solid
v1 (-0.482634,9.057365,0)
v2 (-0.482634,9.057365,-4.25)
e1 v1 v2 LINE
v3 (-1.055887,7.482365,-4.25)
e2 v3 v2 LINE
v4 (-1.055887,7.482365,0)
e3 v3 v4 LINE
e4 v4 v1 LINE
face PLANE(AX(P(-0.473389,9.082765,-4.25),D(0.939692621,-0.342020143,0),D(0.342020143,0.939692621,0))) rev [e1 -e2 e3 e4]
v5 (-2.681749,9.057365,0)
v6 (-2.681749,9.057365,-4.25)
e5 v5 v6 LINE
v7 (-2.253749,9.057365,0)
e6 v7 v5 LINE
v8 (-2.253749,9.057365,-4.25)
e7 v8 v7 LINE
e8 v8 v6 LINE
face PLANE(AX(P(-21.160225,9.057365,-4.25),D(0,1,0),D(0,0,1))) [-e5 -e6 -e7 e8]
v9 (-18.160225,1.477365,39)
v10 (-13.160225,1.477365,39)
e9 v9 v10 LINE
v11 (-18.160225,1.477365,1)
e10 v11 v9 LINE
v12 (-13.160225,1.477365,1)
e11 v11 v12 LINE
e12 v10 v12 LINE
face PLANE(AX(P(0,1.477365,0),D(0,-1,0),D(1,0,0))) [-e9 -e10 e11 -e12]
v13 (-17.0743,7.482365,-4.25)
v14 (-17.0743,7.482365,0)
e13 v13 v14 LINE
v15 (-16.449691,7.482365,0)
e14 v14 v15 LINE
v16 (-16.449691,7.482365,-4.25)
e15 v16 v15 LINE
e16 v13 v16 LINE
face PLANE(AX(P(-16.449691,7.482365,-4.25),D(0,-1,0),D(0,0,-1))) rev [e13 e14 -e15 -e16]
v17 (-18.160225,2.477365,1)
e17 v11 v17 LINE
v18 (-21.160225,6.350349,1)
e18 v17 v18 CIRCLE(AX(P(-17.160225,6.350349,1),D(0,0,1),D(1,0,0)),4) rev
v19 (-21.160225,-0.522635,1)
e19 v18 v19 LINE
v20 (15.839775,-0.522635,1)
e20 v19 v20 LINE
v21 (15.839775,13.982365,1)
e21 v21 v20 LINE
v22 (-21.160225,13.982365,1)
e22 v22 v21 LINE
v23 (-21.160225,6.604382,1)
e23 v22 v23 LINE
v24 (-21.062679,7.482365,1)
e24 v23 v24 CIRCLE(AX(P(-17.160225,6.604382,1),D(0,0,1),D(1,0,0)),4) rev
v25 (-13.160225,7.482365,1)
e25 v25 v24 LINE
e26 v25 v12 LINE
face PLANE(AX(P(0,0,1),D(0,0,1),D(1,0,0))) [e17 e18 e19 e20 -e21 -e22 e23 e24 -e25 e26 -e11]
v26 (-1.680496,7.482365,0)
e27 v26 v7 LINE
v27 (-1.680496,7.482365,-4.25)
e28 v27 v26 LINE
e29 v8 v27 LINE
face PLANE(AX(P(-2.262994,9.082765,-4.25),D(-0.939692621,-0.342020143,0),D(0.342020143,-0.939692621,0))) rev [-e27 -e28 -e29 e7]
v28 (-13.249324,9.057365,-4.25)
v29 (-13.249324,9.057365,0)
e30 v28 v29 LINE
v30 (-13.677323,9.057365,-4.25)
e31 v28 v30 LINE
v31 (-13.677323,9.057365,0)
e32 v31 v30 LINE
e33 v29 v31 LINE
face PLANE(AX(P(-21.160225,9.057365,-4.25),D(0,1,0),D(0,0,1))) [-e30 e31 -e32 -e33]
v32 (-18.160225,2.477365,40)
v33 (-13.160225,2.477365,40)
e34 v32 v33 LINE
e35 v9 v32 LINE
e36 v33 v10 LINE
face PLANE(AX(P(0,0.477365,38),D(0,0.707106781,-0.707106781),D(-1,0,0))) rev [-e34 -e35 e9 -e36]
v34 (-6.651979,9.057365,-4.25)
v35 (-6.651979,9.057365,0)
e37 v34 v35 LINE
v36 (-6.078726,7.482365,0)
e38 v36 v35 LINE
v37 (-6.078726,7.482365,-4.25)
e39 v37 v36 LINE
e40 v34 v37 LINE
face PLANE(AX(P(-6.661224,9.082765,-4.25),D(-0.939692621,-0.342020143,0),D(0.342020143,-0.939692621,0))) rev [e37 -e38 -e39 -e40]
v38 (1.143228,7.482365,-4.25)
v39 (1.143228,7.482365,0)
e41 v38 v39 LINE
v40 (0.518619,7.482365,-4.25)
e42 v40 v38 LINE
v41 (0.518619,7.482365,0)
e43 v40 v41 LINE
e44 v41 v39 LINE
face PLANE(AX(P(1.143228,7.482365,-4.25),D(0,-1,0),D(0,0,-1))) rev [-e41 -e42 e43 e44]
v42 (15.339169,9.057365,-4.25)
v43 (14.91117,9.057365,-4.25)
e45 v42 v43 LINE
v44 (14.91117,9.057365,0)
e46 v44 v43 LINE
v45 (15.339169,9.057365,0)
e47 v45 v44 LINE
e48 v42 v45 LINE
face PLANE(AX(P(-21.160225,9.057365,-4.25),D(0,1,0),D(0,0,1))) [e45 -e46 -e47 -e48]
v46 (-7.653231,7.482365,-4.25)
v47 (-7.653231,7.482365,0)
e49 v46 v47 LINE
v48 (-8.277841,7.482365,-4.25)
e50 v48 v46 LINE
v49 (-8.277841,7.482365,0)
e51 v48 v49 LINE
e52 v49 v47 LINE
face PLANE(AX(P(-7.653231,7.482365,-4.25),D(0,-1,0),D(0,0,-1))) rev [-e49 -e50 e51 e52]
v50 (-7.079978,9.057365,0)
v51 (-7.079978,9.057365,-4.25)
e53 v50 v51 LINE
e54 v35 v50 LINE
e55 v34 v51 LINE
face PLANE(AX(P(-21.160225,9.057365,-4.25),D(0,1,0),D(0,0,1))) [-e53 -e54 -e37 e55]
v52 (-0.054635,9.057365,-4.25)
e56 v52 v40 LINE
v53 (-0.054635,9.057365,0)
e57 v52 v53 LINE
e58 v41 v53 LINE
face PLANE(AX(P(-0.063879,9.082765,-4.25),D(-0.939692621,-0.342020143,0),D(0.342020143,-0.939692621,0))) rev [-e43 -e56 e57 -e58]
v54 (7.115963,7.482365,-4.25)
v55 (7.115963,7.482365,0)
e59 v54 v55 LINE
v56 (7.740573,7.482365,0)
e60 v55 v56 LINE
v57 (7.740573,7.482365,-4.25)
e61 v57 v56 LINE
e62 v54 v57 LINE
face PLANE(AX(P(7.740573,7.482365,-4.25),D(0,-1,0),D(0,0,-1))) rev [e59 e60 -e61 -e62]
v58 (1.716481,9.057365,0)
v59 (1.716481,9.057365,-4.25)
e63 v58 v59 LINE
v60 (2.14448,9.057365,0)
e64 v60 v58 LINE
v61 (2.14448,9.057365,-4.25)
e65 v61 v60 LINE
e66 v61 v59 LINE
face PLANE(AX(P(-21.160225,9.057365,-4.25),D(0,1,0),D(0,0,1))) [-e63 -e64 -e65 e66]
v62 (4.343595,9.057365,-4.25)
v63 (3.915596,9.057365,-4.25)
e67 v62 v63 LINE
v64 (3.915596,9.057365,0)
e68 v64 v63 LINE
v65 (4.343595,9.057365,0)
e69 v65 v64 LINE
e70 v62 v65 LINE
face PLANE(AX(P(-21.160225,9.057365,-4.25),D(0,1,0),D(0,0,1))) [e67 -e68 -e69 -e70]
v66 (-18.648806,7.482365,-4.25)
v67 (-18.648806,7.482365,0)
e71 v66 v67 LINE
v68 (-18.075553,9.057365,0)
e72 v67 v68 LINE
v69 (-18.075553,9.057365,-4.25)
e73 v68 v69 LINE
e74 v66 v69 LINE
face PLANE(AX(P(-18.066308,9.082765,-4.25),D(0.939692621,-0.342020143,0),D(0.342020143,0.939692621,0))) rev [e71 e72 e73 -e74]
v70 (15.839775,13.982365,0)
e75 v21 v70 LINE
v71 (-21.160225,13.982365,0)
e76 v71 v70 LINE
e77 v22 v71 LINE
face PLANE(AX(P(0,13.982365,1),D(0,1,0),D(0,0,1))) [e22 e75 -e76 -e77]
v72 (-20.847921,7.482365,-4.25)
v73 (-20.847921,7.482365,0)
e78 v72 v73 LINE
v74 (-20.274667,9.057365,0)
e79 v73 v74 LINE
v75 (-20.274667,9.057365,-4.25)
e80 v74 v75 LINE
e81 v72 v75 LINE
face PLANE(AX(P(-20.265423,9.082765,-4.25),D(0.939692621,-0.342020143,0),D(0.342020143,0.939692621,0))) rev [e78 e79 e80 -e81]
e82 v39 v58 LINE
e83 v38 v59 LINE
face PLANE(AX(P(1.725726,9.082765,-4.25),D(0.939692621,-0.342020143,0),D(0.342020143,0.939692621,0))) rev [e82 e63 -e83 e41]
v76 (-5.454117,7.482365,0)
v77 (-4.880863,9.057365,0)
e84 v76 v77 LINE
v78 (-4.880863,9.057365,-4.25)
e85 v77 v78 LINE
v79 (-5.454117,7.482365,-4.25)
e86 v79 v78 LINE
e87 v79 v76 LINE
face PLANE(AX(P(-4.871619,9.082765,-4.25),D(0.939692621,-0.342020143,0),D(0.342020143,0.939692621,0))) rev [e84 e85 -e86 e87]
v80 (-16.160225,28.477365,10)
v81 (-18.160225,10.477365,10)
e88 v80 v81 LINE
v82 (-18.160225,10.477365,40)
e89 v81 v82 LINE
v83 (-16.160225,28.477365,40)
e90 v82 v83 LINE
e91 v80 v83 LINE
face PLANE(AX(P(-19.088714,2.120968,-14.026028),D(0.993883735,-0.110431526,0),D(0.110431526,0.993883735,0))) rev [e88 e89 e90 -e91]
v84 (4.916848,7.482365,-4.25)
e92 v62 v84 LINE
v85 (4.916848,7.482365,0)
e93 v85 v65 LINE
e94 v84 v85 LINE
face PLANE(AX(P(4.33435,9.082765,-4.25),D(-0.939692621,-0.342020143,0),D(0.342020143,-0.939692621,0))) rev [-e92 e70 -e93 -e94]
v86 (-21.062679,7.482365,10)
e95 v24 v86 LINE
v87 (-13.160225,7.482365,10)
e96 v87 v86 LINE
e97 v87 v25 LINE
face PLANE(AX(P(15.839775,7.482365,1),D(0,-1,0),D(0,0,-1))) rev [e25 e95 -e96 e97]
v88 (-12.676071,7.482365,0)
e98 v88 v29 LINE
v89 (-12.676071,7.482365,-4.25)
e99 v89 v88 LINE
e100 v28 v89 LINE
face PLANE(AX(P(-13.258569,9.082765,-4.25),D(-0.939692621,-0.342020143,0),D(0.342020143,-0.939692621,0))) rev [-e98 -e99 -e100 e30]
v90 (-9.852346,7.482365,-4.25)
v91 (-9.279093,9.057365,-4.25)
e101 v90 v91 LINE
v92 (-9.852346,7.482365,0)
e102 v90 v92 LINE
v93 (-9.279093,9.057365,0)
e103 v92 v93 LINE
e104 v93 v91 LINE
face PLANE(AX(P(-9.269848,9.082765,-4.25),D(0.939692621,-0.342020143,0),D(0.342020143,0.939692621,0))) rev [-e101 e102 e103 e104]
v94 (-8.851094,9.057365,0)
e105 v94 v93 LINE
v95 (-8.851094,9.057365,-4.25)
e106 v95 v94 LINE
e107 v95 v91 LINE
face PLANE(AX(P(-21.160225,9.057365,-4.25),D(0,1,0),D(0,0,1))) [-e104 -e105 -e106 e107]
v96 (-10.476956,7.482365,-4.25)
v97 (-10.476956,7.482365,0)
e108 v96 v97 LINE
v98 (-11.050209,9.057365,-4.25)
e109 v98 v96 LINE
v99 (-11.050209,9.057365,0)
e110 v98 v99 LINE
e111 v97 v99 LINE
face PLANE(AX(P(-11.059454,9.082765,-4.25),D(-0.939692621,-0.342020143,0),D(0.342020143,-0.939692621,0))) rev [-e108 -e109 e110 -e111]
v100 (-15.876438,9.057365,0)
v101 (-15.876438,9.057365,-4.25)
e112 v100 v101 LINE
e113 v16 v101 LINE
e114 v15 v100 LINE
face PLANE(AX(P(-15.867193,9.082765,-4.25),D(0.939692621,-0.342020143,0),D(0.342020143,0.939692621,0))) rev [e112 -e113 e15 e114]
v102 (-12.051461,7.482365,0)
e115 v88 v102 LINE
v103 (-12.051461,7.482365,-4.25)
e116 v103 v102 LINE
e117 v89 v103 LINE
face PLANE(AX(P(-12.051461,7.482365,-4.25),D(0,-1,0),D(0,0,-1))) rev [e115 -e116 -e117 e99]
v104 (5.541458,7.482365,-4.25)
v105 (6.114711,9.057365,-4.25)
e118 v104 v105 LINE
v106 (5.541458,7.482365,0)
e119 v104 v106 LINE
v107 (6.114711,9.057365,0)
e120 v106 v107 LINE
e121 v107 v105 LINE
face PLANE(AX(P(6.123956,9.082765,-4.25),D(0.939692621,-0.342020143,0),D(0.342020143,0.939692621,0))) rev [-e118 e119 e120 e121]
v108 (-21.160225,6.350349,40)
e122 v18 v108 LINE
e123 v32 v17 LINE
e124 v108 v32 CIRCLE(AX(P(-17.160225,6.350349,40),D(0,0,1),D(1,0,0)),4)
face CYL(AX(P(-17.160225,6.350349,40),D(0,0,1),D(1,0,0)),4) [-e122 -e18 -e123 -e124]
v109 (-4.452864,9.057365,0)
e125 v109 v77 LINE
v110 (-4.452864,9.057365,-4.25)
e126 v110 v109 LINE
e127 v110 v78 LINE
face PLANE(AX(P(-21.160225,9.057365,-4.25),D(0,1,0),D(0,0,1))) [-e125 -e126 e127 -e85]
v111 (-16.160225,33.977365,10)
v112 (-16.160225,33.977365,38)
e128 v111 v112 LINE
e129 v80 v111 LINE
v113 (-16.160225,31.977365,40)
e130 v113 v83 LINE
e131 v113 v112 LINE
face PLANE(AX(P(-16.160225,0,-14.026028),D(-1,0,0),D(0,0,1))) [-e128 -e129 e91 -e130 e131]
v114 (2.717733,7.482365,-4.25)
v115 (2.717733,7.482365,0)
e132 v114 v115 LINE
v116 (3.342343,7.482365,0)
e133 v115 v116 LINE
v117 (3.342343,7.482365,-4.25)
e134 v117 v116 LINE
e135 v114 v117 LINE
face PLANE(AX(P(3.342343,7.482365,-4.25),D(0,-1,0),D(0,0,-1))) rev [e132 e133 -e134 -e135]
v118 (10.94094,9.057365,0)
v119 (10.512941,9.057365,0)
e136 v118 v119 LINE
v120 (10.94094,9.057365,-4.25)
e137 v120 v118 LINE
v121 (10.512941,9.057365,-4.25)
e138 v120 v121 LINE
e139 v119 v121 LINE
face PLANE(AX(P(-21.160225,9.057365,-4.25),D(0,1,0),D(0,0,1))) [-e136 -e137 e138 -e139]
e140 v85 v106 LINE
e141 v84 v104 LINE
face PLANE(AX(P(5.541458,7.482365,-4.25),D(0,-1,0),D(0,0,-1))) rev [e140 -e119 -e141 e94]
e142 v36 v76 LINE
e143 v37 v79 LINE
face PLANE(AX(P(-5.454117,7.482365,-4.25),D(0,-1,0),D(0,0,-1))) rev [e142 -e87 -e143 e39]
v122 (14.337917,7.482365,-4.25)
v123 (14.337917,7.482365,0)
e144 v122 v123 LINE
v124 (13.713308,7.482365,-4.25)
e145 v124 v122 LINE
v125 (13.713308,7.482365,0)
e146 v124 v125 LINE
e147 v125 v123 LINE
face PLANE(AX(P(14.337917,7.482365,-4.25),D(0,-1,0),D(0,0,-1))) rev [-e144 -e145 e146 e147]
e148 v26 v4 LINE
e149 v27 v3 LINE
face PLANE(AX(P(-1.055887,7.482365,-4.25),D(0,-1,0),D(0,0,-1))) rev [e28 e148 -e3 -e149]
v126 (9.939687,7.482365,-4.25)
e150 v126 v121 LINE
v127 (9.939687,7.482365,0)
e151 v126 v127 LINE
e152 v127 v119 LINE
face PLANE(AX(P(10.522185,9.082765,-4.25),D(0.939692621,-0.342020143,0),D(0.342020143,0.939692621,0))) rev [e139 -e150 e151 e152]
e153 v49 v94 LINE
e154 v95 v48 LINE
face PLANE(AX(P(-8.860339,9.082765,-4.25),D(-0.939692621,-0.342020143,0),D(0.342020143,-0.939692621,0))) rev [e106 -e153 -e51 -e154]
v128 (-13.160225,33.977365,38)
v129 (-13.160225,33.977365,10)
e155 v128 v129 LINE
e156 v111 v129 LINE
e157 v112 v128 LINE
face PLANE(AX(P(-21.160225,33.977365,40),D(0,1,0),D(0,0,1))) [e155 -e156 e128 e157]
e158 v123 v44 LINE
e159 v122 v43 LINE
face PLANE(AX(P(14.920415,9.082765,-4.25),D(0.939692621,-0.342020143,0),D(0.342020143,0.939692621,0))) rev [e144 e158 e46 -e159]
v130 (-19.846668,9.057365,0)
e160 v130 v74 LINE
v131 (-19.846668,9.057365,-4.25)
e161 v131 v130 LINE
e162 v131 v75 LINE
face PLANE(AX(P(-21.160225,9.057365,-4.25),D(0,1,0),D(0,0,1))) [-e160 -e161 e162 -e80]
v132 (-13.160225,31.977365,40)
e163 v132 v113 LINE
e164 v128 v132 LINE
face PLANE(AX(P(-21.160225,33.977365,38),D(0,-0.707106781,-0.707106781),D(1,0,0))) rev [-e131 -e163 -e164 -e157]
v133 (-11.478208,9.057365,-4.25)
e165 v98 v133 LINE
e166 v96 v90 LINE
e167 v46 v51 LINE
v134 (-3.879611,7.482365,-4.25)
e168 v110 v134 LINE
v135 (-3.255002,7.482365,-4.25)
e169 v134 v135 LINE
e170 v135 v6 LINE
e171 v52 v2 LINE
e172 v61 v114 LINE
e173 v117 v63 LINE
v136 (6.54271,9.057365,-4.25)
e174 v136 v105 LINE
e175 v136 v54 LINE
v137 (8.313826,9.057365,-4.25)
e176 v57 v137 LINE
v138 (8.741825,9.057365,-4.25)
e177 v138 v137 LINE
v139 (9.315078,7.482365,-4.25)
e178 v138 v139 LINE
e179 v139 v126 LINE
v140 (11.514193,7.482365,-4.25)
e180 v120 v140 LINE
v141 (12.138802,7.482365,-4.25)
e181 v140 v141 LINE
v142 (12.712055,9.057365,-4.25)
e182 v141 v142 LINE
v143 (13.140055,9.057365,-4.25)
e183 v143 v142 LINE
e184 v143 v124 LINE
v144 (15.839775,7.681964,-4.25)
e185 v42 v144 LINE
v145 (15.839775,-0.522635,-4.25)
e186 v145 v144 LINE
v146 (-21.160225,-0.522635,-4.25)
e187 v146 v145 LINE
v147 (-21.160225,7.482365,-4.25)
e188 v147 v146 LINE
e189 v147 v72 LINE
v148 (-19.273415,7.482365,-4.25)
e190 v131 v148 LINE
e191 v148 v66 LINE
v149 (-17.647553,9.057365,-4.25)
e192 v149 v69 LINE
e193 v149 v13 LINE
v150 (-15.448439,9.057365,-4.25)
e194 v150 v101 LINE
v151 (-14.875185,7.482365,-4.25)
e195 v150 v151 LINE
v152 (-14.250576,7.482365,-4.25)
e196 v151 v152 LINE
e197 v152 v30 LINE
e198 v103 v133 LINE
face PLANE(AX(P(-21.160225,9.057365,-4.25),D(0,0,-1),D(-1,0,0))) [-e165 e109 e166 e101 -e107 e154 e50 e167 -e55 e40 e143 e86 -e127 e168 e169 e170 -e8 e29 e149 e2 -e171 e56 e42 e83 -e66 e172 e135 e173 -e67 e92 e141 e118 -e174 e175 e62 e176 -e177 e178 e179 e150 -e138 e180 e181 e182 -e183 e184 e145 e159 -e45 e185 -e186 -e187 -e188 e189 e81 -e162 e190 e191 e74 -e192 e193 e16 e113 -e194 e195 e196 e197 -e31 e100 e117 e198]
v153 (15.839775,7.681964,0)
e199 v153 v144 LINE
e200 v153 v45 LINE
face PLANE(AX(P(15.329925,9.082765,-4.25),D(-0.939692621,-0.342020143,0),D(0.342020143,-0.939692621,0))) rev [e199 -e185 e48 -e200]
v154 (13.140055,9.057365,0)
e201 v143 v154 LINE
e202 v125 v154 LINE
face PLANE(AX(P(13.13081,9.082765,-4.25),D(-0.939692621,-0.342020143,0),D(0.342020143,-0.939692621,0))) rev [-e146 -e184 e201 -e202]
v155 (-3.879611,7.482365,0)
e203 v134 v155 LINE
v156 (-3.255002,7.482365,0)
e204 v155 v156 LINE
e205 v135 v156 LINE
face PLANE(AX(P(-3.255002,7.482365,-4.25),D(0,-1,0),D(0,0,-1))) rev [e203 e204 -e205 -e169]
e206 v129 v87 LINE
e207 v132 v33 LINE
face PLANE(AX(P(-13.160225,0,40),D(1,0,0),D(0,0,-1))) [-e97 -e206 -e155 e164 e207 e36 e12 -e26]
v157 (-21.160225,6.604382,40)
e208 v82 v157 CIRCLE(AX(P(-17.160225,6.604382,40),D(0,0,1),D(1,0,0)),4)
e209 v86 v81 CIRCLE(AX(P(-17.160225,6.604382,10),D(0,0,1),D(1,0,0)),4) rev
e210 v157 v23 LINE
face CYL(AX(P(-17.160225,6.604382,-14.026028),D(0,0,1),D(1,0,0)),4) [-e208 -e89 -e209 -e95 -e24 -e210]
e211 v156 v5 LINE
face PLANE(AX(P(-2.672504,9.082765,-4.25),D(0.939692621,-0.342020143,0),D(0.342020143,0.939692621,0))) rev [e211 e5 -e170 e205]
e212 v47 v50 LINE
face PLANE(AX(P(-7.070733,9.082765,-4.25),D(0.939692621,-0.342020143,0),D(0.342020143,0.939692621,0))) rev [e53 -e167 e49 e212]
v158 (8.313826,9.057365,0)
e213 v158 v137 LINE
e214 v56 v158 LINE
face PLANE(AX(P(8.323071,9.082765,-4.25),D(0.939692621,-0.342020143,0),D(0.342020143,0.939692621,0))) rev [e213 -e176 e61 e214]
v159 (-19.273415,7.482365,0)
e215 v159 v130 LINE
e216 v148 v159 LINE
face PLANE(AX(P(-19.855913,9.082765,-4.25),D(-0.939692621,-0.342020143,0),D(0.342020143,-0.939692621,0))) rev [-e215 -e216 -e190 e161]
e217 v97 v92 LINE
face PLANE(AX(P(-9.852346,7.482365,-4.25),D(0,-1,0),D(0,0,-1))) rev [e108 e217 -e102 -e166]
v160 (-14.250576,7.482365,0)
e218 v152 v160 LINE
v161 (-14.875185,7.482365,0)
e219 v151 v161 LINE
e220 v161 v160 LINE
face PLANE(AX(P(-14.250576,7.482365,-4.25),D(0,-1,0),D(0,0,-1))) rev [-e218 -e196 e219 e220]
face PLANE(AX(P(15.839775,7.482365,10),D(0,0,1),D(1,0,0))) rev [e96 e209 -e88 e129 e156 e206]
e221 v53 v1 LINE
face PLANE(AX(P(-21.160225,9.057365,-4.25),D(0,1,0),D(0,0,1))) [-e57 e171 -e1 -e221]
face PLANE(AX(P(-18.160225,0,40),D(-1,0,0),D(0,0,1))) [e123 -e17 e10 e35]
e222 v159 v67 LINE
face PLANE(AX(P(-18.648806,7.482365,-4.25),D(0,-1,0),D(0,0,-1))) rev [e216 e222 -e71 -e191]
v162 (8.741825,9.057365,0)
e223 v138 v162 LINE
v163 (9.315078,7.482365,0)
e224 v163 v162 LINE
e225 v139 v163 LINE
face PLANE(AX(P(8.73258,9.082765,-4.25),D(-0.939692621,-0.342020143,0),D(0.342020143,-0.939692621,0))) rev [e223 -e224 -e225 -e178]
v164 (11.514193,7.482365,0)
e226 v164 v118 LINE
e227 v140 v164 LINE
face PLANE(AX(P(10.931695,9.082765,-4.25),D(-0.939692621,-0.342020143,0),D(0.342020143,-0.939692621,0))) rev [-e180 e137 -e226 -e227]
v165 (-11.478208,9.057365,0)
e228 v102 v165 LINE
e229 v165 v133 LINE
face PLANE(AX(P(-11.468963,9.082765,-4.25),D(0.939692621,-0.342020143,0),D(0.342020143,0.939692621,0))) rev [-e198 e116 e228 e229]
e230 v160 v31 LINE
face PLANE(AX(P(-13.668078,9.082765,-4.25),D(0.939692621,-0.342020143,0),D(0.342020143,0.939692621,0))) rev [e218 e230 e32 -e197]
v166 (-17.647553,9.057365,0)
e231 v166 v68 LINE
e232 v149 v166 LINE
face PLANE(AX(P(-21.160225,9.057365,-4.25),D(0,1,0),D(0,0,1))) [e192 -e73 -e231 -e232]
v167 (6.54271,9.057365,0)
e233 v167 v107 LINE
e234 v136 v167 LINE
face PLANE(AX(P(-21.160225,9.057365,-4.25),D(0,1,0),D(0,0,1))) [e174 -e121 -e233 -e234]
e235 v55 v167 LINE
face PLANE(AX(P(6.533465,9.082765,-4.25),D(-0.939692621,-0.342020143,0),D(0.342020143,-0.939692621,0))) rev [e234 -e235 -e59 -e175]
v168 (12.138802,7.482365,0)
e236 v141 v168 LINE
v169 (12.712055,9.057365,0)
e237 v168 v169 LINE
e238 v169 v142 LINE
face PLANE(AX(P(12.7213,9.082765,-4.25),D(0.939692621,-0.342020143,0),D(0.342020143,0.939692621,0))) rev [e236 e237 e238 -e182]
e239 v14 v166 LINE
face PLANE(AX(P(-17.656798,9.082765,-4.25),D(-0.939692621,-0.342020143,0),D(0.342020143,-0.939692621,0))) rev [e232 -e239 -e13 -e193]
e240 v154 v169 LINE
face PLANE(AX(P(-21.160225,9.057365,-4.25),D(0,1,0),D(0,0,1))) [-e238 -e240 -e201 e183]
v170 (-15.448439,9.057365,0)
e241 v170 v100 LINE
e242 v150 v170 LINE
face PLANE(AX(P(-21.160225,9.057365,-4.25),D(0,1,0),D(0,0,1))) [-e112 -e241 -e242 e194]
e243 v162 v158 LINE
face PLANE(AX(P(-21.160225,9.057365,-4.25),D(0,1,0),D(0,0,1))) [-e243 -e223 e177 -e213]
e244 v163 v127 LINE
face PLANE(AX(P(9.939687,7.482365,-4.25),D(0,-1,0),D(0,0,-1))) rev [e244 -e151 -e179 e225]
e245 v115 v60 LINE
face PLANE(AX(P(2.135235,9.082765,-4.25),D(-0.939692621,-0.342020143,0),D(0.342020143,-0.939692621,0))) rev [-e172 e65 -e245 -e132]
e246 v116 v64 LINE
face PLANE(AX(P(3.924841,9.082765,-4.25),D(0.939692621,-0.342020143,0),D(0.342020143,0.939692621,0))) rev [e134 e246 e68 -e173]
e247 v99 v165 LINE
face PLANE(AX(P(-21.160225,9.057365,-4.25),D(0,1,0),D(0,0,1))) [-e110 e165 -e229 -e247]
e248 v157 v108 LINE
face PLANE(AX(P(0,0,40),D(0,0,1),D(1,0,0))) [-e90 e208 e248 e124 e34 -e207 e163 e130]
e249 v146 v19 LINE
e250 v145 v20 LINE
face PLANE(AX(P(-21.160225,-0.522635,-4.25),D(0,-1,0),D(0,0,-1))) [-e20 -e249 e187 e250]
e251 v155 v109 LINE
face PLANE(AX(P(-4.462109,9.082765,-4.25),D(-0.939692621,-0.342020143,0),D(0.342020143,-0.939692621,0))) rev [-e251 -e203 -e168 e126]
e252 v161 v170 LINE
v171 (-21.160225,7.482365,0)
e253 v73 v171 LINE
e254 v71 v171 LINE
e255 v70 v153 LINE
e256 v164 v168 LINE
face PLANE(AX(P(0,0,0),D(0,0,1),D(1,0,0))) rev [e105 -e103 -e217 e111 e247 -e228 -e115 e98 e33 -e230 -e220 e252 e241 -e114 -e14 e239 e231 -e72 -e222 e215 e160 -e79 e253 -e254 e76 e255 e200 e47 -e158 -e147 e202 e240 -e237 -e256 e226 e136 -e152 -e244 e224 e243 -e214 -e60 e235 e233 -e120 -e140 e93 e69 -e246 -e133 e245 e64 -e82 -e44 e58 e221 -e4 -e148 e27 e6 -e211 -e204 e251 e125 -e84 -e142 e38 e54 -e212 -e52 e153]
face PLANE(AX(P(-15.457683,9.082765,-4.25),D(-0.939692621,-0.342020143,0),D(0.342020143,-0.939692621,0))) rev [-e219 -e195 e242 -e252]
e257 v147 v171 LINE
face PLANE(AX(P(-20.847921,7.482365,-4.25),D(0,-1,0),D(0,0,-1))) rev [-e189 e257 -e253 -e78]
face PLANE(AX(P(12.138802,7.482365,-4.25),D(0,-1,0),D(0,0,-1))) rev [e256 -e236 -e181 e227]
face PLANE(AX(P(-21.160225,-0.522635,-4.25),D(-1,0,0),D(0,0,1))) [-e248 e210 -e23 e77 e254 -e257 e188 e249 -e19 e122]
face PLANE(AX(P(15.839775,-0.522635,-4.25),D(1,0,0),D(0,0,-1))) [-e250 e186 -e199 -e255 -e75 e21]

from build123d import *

# Parameters (mm, degrees)
SKETCH1_W           = 37
SKETCH1_H           = 8.005
SKETCH1_H_2         = 6.5
BOSS_EXTRUDE2_DEPTH = 1
BOSS_EXTRUDE3_DEPTH = 39
SKETCH3_W           = 9
SKETCH3_H           = 26.495
CUT_EXTRUDE1_DEPTH  = 65.214183639
SKETCH5_W           = 5
SKETCH5_H           = 5.5
CUT_EXTRUDE2_DEPTH  = 30
FILLET3_R           = 4
CHAMFER1_SIZE       = 2
SKETCH6_W           = 18.033887542
SKETCH6_H           = 50.935114565
CUT_EXTRUDE3_DEPTH  = 1


with BuildPart() as part:
    # <Rack>-<rack spur rectangular_am-5-solid1>: read off the stored shape, not the designer's step
    # <Rack>-<rack spur rectangular_am-5-solid1>: loft between two sections, ruled curve by curve
    rack_rack_spur_rectangular_am_5_solid1_from = [
        Edge.make_line((-44.536254126, 16.385147548, 25.848409668), (-44.964253225, 16.385147548, 25.848409668)),
        Edge.make_line((-46.735368981, 16.385147548, 25.848409668), (-47.16336808, 16.385147548, 25.848409668)),
        Edge.make_line((-48.934483836, 16.385147548, 25.848409668), (-49.362482935, 16.385147548, 25.848409668)),
        Edge.make_line((-51.133598691, 16.385147548, 25.848409668), (-51.56159779, 16.385147548, 25.848409668)),
        Edge.make_line((-53.332713546, 16.385147548, 25.848409668), (-53.760712645, 16.385147548, 25.848409668)),
        Edge.make_line((-55.531828401, 16.385147548, 25.848409668), (-55.9598275, 16.385147548, 25.848409668)),
        Edge.make_line((-57.730943256, 16.385147548, 25.848409668), (-58.158942355, 16.385147548, 25.848409668)),
        Edge.make_line((-59.930058111, 16.385147548, 25.848409668), (-60.35805721, 16.385147548, 25.848409668)),
        Edge.make_line((-62.129172966, 16.385147548, 25.848409668), (-62.557172065, 16.385147548, 25.848409668)),
        Edge.make_line((-64.328287821, 16.385147548, 25.848409668), (-64.75628692, 16.385147548, 25.848409668)),
        Edge.make_line((-66.527402676, 16.385147548, 25.848409668), (-66.955401775, 16.385147548, 25.848409668)),
        Edge.make_line((-68.726517531, 16.385147548, 25.848409668), (-69.15451663, 16.385147548, 25.848409668)),
        Edge.make_line((-70.925632386, 16.385147548, 25.848409668), (-71.353631485, 16.385147548, 25.848409668)),
        Edge.make_line((-73.124747241, 16.385147548, 25.848409668), (-73.55274634, 16.385147548, 25.848409668)),
        Edge.make_line((-75.323862096, 16.385147548, 25.848409668), (-75.751861195, 16.385147548, 25.848409668)),
        Edge.make_line((-77.522976951, 16.385147548, 25.848409668), (-77.95097605, 16.385147548, 25.848409668)),
        Edge.make_line((-78.836533928, 14.810147548, 25.848409668), (-78.836533928, 6.805147548, 25.848409668)),
        Edge.make_line((-42.337139271, 16.385147548, 25.848409668), (-42.76513837, 16.385147548, 25.848409668)),
        Edge.make_line((-41.836533928, 15.009745672, 25.848409668), (-41.836533928, 6.805147548, 25.848409668)),
        Edge.make_line((-78.836533928, 6.805147548, 25.848409668), (-41.836533928, 6.805147548, 25.848409668)),
        Edge.make_line((-77.95097605, 16.385147548, 25.848409668), (-78.524229169, 14.810147548, 25.848409668)),
        Edge.make_line((-78.836533928, 14.810147548, 25.848409668), (-78.524229169, 14.810147548, 25.848409668)),
        Edge.make_line((-77.522976951, 16.385147548, 25.848409668), (-76.949723832, 14.810147548, 25.848409668)),
        Edge.make_line((-75.751861195, 16.385147548, 25.848409668), (-76.325114314, 14.810147548, 25.848409668)),
        Edge.make_line((-76.949723832, 14.810147548, 25.848409668), (-76.325114314, 14.810147548, 25.848409668)),
        Edge.make_line((-75.323862096, 16.385147548, 25.848409668), (-74.750608977, 14.810147548, 25.848409668)),
        Edge.make_line((-73.55274634, 16.385147548, 25.848409668), (-74.125999459, 14.810147548, 25.848409668)),
        Edge.make_line((-74.750608977, 14.810147548, 25.848409668), (-74.125999459, 14.810147548, 25.848409668)),
        Edge.make_line((-73.124747241, 16.385147548, 25.848409668), (-72.551494122, 14.810147548, 25.848409668)),
        Edge.make_line((-71.353631485, 16.385147548, 25.848409668), (-71.926884604, 14.810147548, 25.848409668)),
        Edge.make_line((-72.551494122, 14.810147548, 25.848409668), (-71.926884604, 14.810147548, 25.848409668)),
        Edge.make_line((-70.925632386, 16.385147548, 25.848409668), (-70.352379267, 14.810147548, 25.848409668)),
        Edge.make_line((-69.15451663, 16.385147548, 25.848409668), (-69.727769749, 14.810147548, 25.848409668)),
        Edge.make_line((-70.352379267, 14.810147548, 25.848409668), (-69.727769749, 14.810147548, 25.848409668)),
        Edge.make_line((-68.726517531, 16.385147548, 25.848409668), (-68.153264412, 14.810147548, 25.848409668)),
        Edge.make_line((-66.955401775, 16.385147548, 25.848409668), (-67.528654894, 14.810147548, 25.848409668)),
        Edge.make_line((-68.153264412, 14.810147548, 25.848409668), (-67.528654894, 14.810147548, 25.848409668)),
        Edge.make_line((-66.527402676, 16.385147548, 25.848409668), (-65.954149557, 14.810147548, 25.848409668)),
        Edge.make_line((-64.75628692, 16.385147548, 25.848409668), (-65.329540039, 14.810147548, 25.848409668)),
        Edge.make_line((-65.954149557, 14.810147548, 25.848409668), (-65.329540039, 14.810147548, 25.848409668)),
        Edge.make_line((-64.328287821, 16.385147548, 25.848409668), (-63.755034702, 14.810147548, 25.848409668)),
        Edge.make_line((-62.557172065, 16.385147548, 25.848409668), (-63.130425184, 14.810147548, 25.848409668)),
        Edge.make_line((-63.755034702, 14.810147548, 25.848409668), (-63.130425184, 14.810147548, 25.848409668)),
        Edge.make_line((-62.129172966, 16.385147548, 25.848409668), (-61.555919847, 14.810147548, 25.848409668)),
        Edge.make_line((-60.35805721, 16.385147548, 25.848409668), (-60.931310329, 14.810147548, 25.848409668)),
        Edge.make_line((-61.555919847, 14.810147548, 25.848409668), (-60.931310329, 14.810147548, 25.848409668)),
        Edge.make_line((-59.930058111, 16.385147548, 25.848409668), (-59.356804992, 14.810147548, 25.848409668)),
        Edge.make_line((-58.158942355, 16.385147548, 25.848409668), (-58.732195474, 14.810147548, 25.848409668)),
        Edge.make_line((-59.356804992, 14.810147548, 25.848409668), (-58.732195474, 14.810147548, 25.848409668)),
        Edge.make_line((-57.730943256, 16.385147548, 25.848409668), (-57.157690137, 14.810147548, 25.848409668)),
        Edge.make_line((-55.9598275, 16.385147548, 25.848409668), (-56.533080619, 14.810147548, 25.848409668)),
        Edge.make_line((-57.157690137, 14.810147548, 25.848409668), (-56.533080619, 14.810147548, 25.848409668)),
        Edge.make_line((-55.531828401, 16.385147548, 25.848409668), (-54.958575282, 14.810147548, 25.848409668)),
        Edge.make_line((-53.760712645, 16.385147548, 25.848409668), (-54.333965764, 14.810147548, 25.848409668)),
        Edge.make_line((-54.958575282, 14.810147548, 25.848409668), (-54.333965764, 14.810147548, 25.848409668)),
        Edge.make_line((-53.332713546, 16.385147548, 25.848409668), (-52.759460427, 14.810147548, 25.848409668)),
        Edge.make_line((-51.56159779, 16.385147548, 25.848409668), (-52.134850909, 14.810147548, 25.848409668)),
        Edge.make_line((-52.759460427, 14.810147548, 25.848409668), (-52.134850909, 14.810147548, 25.848409668)),
        Edge.make_line((-51.133598691, 16.385147548, 25.848409668), (-50.560345572, 14.810147548, 25.848409668)),
        Edge.make_line((-49.362482935, 16.385147548, 25.848409668), (-49.935736054, 14.810147548, 25.848409668)),
        Edge.make_line((-50.560345572, 14.810147548, 25.848409668), (-49.935736054, 14.810147548, 25.848409668)),
        Edge.make_line((-48.934483836, 16.385147548, 25.848409668), (-48.361230717, 14.810147548, 25.848409668)),
        Edge.make_line((-47.16336808, 16.385147548, 25.848409668), (-47.736621199, 14.810147548, 25.848409668)),
        Edge.make_line((-48.361230717, 14.810147548, 25.848409668), (-47.736621199, 14.810147548, 25.848409668)),
        Edge.make_line((-46.735368981, 16.385147548, 25.848409668), (-46.162115862, 14.810147548, 25.848409668)),
        Edge.make_line((-44.964253225, 16.385147548, 25.848409668), (-45.537506344, 14.810147548, 25.848409668)),
        Edge.make_line((-46.162115862, 14.810147548, 25.848409668), (-45.537506344, 14.810147548, 25.848409668)),
        Edge.make_line((-44.536254126, 16.385147548, 25.848409668), (-43.963001007, 14.810147548, 25.848409668)),
        Edge.make_line((-42.76513837, 16.385147548, 25.848409668), (-43.338391489, 14.810147548, 25.848409668)),
        Edge.make_line((-43.963001007, 14.810147548, 25.848409668), (-43.338391489, 14.810147548, 25.848409668)),
        Edge.make_line((-42.337139271, 16.385147548, 25.848409668), (-41.836533928, 15.009745672, 25.848409668)),
    ]
    rack_rack_spur_rectangular_am_5_solid1_to = [
        Edge.make_line((-44.536254126, 16.385147548, 21.598409668), (-44.964253225, 16.385147548, 21.598409668)),
        Edge.make_line((-46.735368981, 16.385147548, 21.598409668), (-47.16336808, 16.385147548, 21.598409668)),
        Edge.make_line((-48.934483836, 16.385147548, 21.598409668), (-49.362482935, 16.385147548, 21.598409668)),
        Edge.make_line((-51.133598691, 16.385147548, 21.598409668), (-51.56159779, 16.385147548, 21.598409668)),
        Edge.make_line((-53.332713546, 16.385147548, 21.598409668), (-53.760712645, 16.385147548, 21.598409668)),
        Edge.make_line((-55.531828401, 16.385147548, 21.598409668), (-55.9598275, 16.385147548, 21.598409668)),
        Edge.make_line((-57.730943256, 16.385147548, 21.598409668), (-58.158942355, 16.385147548, 21.598409668)),
        Edge.make_line((-59.930058111, 16.385147548, 21.598409668), (-60.35805721, 16.385147548, 21.598409668)),
        Edge.make_line((-62.129172966, 16.385147548, 21.598409668), (-62.557172065, 16.385147548, 21.598409668)),
        Edge.make_line((-64.328287821, 16.385147548, 21.598409668), (-64.75628692, 16.385147548, 21.598409668)),
        Edge.make_line((-66.527402676, 16.385147548, 21.598409668), (-66.955401775, 16.385147548, 21.598409668)),
        Edge.make_line((-68.726517531, 16.385147548, 21.598409668), (-69.15451663, 16.385147548, 21.598409668)),
        Edge.make_line((-70.925632386, 16.385147548, 21.598409668), (-71.353631485, 16.385147548, 21.598409668)),
        Edge.make_line((-73.124747241, 16.385147548, 21.598409668), (-73.55274634, 16.385147548, 21.598409668)),
        Edge.make_line((-75.323862096, 16.385147548, 21.598409668), (-75.751861195, 16.385147548, 21.598409668)),
        Edge.make_line((-77.522976951, 16.385147548, 21.598409668), (-77.95097605, 16.385147548, 21.598409668)),
        Edge.make_line((-78.836533928, 14.810147548, 21.598409668), (-78.836533928, 6.805147548, 21.598409668)),
        Edge.make_line((-42.337139271, 16.385147548, 21.598409668), (-42.76513837, 16.385147548, 21.598409668)),
        Edge.make_line((-41.836533928, 15.009745672, 21.598409668), (-41.836533928, 6.805147548, 21.598409668)),
        Edge.make_line((-78.836533928, 6.805147548, 21.598409668), (-41.836533928, 6.805147548, 21.598409668)),
        Edge.make_line((-77.95097605, 16.385147548, 21.598409668), (-78.524229169, 14.810147548, 21.598409668)),
        Edge.make_line((-78.836533928, 14.810147548, 21.598409668), (-78.524229169, 14.810147548, 21.598409668)),
        Edge.make_line((-77.522976951, 16.385147548, 21.598409668), (-76.949723832, 14.810147548, 21.598409668)),
        Edge.make_line((-75.751861195, 16.385147548, 21.598409668), (-76.325114314, 14.810147548, 21.598409668)),
        Edge.make_line((-76.949723832, 14.810147548, 21.598409668), (-76.325114314, 14.810147548, 21.598409668)),
        Edge.make_line((-75.323862096, 16.385147548, 21.598409668), (-74.750608977, 14.810147548, 21.598409668)),
        Edge.make_line((-73.55274634, 16.385147548, 21.598409668), (-74.125999459, 14.810147548, 21.598409668)),
        Edge.make_line((-74.750608977, 14.810147548, 21.598409668), (-74.125999459, 14.810147548, 21.598409668)),
        Edge.make_line((-73.124747241, 16.385147548, 21.598409668), (-72.551494122, 14.810147548, 21.598409668)),
        Edge.make_line((-71.353631485, 16.385147548, 21.598409668), (-71.926884604, 14.810147548, 21.598409668)),
        Edge.make_line((-72.551494122, 14.810147548, 21.598409668), (-71.926884604, 14.810147548, 21.598409668)),
        Edge.make_line((-70.925632386, 16.385147548, 21.598409668), (-70.352379267, 14.810147548, 21.598409668)),
        Edge.make_line((-69.15451663, 16.385147548, 21.598409668), (-69.727769749, 14.810147548, 21.598409668)),
        Edge.make_line((-70.352379267, 14.810147548, 21.598409668), (-69.727769749, 14.810147548, 21.598409668)),
        Edge.make_line((-68.726517531, 16.385147548, 21.598409668), (-68.153264412, 14.810147548, 21.598409668)),
        Edge.make_line((-66.955401775, 16.385147548, 21.598409668), (-67.528654894, 14.810147548, 21.598409668)),
        Edge.make_line((-68.153264412, 14.810147548, 21.598409668), (-67.528654894, 14.810147548, 21.598409668)),
        Edge.make_line((-66.527402676, 16.385147548, 21.598409668), (-65.954149557, 14.810147548, 21.598409668)),
        Edge.make_line((-64.75628692, 16.385147548, 21.598409668), (-65.329540039, 14.810147548, 21.598409668)),
        Edge.make_line((-65.954149557, 14.810147548, 21.598409668), (-65.329540039, 14.810147548, 21.598409668)),
        Edge.make_line((-64.328287821, 16.385147548, 21.598409668), (-63.755034702, 14.810147548, 21.598409668)),
        Edge.make_line((-62.557172065, 16.385147548, 21.598409668), (-63.130425184, 14.810147548, 21.598409668)),
        Edge.make_line((-63.755034702, 14.810147548, 21.598409668), (-63.130425184, 14.810147548, 21.598409668)),
        Edge.make_line((-62.129172966, 16.385147548, 21.598409668), (-61.555919847, 14.810147548, 21.598409668)),
        Edge.make_line((-60.35805721, 16.385147548, 21.598409668), (-60.931310329, 14.810147548, 21.598409668)),
        Edge.make_line((-61.555919847, 14.810147548, 21.598409668), (-60.931310329, 14.810147548, 21.598409668)),
        Edge.make_line((-59.930058111, 16.385147548, 21.598409668), (-59.356804992, 14.810147548, 21.598409668)),
        Edge.make_line((-58.158942355, 16.385147548, 21.598409668), (-58.732195474, 14.810147548, 21.598409668)),
        Edge.make_line((-59.356804992, 14.810147548, 21.598409668), (-58.732195474, 14.810147548, 21.598409668)),
        Edge.make_line((-57.730943256, 16.385147548, 21.598409668), (-57.157690137, 14.810147548, 21.598409668)),
        Edge.make_line((-55.9598275, 16.385147548, 21.598409668), (-56.533080619, 14.810147548, 21.598409668)),
        Edge.make_line((-57.157690137, 14.810147548, 21.598409668), (-56.533080619, 14.810147548, 21.598409668)),
        Edge.make_line((-55.531828401, 16.385147548, 21.598409668), (-54.958575282, 14.810147548, 21.598409668)),
        Edge.make_line((-53.760712645, 16.385147548, 21.598409668), (-54.333965764, 14.810147548, 21.598409668)),
        Edge.make_line((-54.958575282, 14.810147548, 21.598409668), (-54.333965764, 14.810147548, 21.598409668)),
        Edge.make_line((-53.332713546, 16.385147548, 21.598409668), (-52.759460427, 14.810147548, 21.598409668)),
        Edge.make_line((-51.56159779, 16.385147548, 21.598409668), (-52.134850909, 14.810147548, 21.598409668)),
        Edge.make_line((-52.759460427, 14.810147548, 21.598409668), (-52.134850909, 14.810147548, 21.598409668)),
        Edge.make_line((-51.133598691, 16.385147548, 21.598409668), (-50.560345572, 14.810147548, 21.598409668)),
        Edge.make_line((-49.362482935, 16.385147548, 21.598409668), (-49.935736054, 14.810147548, 21.598409668)),
        Edge.make_line((-50.560345572, 14.810147548, 21.598409668), (-49.935736054, 14.810147548, 21.598409668)),
        Edge.make_line((-48.934483836, 16.385147548, 21.598409668), (-48.361230717, 14.810147548, 21.598409668)),
        Edge.make_line((-47.16336808, 16.385147548, 21.598409668), (-47.736621199, 14.810147548, 21.598409668)),
        Edge.make_line((-48.361230717, 14.810147548, 21.598409668), (-47.736621199, 14.810147548, 21.598409668)),
        Edge.make_line((-46.735368981, 16.385147548, 21.598409668), (-46.162115862, 14.810147548, 21.598409668)),
        Edge.make_line((-44.964253225, 16.385147548, 21.598409668), (-45.537506344, 14.810147548, 21.598409668)),
        Edge.make_line((-46.162115862, 14.810147548, 21.598409668), (-45.537506344, 14.810147548, 21.598409668)),
        Edge.make_line((-44.536254126, 16.385147548, 21.598409668), (-43.963001007, 14.810147548, 21.598409668)),
        Edge.make_line((-42.76513837, 16.385147548, 21.598409668), (-43.338391489, 14.810147548, 21.598409668)),
        Edge.make_line((-43.963001007, 14.810147548, 21.598409668), (-43.338391489, 14.810147548, 21.598409668)),
        Edge.make_line((-42.337139271, 16.385147548, 21.598409668), (-41.836533928, 15.009745672, 21.598409668)),
    ]
    rack_rack_spur_rectangular_am_5_solid1 = Solid(Shell([*[Face.make_surface_from_curves(rack_rack_spur_rectangular_am_5_solid1_from[k], rack_rack_spur_rectangular_am_5_solid1_to[k]) for k in range(71)], Face(Wire(rack_rack_spur_rectangular_am_5_solid1_from)), Face(Wire(rack_rack_spur_rectangular_am_5_solid1_to))]))
    add(rack_rack_spur_rectangular_am_5_solid1)


with BuildPart() as part_1:
    # Rack: read off the stored shape, not the designer's step
    # Rack: moved
    add(part.part.moved(Location((57.6763086, -7.3277822, -25.8484097))))

    # Sketch1 → Boss-Extrude2 (add)
    with BuildSketch(Plane.XY):
        with Locations((-2.66022528, 3.47986538)):
            Rectangle(SKETCH1_W, SKETCH1_H)
        with Locations((-2.66022528, 10.73236538)):
            Rectangle(SKETCH1_W, SKETCH1_H_2)
    extrude(amount=BOSS_EXTRUDE2_DEPTH)

    # Sketch2 → Boss-Extrude3 (add)
    with BuildSketch(Plane.XY.offset(1)):
        Polygon((-21.16022528, 33.97736538), (-21.16022528, 2.47736538), (-18.16022528, 2.47736538), (-18.16022528, 0.47736538), (-13.16022528, 0.47736538), (-13.16022528, 33.97736538), align=None)
    extrude(amount=BOSS_EXTRUDE3_DEPTH)

    # Sketch3 → Cut-Extrude1 (cut, through all)
    with BuildSketch(Plane.ZY.offset(21.16022528)):
        with Locations((5.5, 20.72986538)):
            Rectangle(SKETCH3_W, SKETCH3_H)
    extrude(amount=-CUT_EXTRUDE1_DEPTH, mode=Mode.SUBTRACT)

    # Sketch5 → Cut-Extrude2 (cut)
    with BuildSketch(Plane.XY.offset(40)):
        with Locations((-18.66022528, 31.22736538)):
            Rectangle(SKETCH5_W, SKETCH5_H)
        Polygon((-21.16022528, 28.47736538), (-21.16022528, 10.47736538), (-18.16022528, 10.47736538), (-16.16022528, 28.47736538), align=None)
    extrude(amount=-CUT_EXTRUDE2_DEPTH, mode=Mode.SUBTRACT)

    # Fillet3
    # the kernel refuses this fillet: 4 mm, written as the material it takes off along each edge
    with BuildSketch(Plane(origin=(-21.16022528, 2.47736538, 1), x_dir=(0, 1, 0), z_dir=(0, 0, 1))) as fillet3_piece_1:
        with BuildLine():
            CenterArc((3.872983346, -4), FILLET3_R, 90, 75.522487814)
            Line((0, -3), (0, 0))
            Line((0, 0), (3.872983346, 0))
        make_face()
    extrude(amount=48.682458366, mode=Mode.SUBTRACT)
    with BuildSketch(Plane(origin=(-21.16022528, 10.47736538, 49.682458366), x_dir=(0, -1, 0), z_dir=(0, 0, -1))) as fillet3_piece_2_section:
        with BuildLine():
            CenterArc((3.872983346, -4), FILLET3_R, 90, 75.522487814)
            Line((0, -3), (0, 0))
            Line((0, 0), (3.872983346, 0))
        make_face()
    fillet3_piece_2 = extrude(amount=49.364916731, mode=Mode.PRIVATE)
    fillet3_piece_2 = split(fillet3_piece_2, bisect_by=Plane(origin=(-21.16022528, 10.47736538, 1), z_dir=(0, 0, 1)), keep=Keep.TOP, mode=Mode.PRIVATE)
    add(fillet3_piece_2, mode=Mode.SUBTRACT)

    # Chamfer1
    chamfer1_edges = [part_1.edges().sort_by_distance(p)[0] for p in [
        (-15.66022528, 0.47736538, 40),
        (-14.66022528, 33.97736538, 40),
    ]]
    chamfer(chamfer1_edges, length=CHAMFER1_SIZE)

    # Sketch6 → Cut-Extrude3 (cut)
    with BuildSketch(Plane.XZ.offset(-0.47736538)):
        with Locations((-16.99836785, 26.467557283)):
            Rectangle(SKETCH6_W, SKETCH6_H)
    extrude(amount=-CUT_EXTRUDE3_DEPTH, mode=Mode.SUBTRACT)


solid = part_1.part
